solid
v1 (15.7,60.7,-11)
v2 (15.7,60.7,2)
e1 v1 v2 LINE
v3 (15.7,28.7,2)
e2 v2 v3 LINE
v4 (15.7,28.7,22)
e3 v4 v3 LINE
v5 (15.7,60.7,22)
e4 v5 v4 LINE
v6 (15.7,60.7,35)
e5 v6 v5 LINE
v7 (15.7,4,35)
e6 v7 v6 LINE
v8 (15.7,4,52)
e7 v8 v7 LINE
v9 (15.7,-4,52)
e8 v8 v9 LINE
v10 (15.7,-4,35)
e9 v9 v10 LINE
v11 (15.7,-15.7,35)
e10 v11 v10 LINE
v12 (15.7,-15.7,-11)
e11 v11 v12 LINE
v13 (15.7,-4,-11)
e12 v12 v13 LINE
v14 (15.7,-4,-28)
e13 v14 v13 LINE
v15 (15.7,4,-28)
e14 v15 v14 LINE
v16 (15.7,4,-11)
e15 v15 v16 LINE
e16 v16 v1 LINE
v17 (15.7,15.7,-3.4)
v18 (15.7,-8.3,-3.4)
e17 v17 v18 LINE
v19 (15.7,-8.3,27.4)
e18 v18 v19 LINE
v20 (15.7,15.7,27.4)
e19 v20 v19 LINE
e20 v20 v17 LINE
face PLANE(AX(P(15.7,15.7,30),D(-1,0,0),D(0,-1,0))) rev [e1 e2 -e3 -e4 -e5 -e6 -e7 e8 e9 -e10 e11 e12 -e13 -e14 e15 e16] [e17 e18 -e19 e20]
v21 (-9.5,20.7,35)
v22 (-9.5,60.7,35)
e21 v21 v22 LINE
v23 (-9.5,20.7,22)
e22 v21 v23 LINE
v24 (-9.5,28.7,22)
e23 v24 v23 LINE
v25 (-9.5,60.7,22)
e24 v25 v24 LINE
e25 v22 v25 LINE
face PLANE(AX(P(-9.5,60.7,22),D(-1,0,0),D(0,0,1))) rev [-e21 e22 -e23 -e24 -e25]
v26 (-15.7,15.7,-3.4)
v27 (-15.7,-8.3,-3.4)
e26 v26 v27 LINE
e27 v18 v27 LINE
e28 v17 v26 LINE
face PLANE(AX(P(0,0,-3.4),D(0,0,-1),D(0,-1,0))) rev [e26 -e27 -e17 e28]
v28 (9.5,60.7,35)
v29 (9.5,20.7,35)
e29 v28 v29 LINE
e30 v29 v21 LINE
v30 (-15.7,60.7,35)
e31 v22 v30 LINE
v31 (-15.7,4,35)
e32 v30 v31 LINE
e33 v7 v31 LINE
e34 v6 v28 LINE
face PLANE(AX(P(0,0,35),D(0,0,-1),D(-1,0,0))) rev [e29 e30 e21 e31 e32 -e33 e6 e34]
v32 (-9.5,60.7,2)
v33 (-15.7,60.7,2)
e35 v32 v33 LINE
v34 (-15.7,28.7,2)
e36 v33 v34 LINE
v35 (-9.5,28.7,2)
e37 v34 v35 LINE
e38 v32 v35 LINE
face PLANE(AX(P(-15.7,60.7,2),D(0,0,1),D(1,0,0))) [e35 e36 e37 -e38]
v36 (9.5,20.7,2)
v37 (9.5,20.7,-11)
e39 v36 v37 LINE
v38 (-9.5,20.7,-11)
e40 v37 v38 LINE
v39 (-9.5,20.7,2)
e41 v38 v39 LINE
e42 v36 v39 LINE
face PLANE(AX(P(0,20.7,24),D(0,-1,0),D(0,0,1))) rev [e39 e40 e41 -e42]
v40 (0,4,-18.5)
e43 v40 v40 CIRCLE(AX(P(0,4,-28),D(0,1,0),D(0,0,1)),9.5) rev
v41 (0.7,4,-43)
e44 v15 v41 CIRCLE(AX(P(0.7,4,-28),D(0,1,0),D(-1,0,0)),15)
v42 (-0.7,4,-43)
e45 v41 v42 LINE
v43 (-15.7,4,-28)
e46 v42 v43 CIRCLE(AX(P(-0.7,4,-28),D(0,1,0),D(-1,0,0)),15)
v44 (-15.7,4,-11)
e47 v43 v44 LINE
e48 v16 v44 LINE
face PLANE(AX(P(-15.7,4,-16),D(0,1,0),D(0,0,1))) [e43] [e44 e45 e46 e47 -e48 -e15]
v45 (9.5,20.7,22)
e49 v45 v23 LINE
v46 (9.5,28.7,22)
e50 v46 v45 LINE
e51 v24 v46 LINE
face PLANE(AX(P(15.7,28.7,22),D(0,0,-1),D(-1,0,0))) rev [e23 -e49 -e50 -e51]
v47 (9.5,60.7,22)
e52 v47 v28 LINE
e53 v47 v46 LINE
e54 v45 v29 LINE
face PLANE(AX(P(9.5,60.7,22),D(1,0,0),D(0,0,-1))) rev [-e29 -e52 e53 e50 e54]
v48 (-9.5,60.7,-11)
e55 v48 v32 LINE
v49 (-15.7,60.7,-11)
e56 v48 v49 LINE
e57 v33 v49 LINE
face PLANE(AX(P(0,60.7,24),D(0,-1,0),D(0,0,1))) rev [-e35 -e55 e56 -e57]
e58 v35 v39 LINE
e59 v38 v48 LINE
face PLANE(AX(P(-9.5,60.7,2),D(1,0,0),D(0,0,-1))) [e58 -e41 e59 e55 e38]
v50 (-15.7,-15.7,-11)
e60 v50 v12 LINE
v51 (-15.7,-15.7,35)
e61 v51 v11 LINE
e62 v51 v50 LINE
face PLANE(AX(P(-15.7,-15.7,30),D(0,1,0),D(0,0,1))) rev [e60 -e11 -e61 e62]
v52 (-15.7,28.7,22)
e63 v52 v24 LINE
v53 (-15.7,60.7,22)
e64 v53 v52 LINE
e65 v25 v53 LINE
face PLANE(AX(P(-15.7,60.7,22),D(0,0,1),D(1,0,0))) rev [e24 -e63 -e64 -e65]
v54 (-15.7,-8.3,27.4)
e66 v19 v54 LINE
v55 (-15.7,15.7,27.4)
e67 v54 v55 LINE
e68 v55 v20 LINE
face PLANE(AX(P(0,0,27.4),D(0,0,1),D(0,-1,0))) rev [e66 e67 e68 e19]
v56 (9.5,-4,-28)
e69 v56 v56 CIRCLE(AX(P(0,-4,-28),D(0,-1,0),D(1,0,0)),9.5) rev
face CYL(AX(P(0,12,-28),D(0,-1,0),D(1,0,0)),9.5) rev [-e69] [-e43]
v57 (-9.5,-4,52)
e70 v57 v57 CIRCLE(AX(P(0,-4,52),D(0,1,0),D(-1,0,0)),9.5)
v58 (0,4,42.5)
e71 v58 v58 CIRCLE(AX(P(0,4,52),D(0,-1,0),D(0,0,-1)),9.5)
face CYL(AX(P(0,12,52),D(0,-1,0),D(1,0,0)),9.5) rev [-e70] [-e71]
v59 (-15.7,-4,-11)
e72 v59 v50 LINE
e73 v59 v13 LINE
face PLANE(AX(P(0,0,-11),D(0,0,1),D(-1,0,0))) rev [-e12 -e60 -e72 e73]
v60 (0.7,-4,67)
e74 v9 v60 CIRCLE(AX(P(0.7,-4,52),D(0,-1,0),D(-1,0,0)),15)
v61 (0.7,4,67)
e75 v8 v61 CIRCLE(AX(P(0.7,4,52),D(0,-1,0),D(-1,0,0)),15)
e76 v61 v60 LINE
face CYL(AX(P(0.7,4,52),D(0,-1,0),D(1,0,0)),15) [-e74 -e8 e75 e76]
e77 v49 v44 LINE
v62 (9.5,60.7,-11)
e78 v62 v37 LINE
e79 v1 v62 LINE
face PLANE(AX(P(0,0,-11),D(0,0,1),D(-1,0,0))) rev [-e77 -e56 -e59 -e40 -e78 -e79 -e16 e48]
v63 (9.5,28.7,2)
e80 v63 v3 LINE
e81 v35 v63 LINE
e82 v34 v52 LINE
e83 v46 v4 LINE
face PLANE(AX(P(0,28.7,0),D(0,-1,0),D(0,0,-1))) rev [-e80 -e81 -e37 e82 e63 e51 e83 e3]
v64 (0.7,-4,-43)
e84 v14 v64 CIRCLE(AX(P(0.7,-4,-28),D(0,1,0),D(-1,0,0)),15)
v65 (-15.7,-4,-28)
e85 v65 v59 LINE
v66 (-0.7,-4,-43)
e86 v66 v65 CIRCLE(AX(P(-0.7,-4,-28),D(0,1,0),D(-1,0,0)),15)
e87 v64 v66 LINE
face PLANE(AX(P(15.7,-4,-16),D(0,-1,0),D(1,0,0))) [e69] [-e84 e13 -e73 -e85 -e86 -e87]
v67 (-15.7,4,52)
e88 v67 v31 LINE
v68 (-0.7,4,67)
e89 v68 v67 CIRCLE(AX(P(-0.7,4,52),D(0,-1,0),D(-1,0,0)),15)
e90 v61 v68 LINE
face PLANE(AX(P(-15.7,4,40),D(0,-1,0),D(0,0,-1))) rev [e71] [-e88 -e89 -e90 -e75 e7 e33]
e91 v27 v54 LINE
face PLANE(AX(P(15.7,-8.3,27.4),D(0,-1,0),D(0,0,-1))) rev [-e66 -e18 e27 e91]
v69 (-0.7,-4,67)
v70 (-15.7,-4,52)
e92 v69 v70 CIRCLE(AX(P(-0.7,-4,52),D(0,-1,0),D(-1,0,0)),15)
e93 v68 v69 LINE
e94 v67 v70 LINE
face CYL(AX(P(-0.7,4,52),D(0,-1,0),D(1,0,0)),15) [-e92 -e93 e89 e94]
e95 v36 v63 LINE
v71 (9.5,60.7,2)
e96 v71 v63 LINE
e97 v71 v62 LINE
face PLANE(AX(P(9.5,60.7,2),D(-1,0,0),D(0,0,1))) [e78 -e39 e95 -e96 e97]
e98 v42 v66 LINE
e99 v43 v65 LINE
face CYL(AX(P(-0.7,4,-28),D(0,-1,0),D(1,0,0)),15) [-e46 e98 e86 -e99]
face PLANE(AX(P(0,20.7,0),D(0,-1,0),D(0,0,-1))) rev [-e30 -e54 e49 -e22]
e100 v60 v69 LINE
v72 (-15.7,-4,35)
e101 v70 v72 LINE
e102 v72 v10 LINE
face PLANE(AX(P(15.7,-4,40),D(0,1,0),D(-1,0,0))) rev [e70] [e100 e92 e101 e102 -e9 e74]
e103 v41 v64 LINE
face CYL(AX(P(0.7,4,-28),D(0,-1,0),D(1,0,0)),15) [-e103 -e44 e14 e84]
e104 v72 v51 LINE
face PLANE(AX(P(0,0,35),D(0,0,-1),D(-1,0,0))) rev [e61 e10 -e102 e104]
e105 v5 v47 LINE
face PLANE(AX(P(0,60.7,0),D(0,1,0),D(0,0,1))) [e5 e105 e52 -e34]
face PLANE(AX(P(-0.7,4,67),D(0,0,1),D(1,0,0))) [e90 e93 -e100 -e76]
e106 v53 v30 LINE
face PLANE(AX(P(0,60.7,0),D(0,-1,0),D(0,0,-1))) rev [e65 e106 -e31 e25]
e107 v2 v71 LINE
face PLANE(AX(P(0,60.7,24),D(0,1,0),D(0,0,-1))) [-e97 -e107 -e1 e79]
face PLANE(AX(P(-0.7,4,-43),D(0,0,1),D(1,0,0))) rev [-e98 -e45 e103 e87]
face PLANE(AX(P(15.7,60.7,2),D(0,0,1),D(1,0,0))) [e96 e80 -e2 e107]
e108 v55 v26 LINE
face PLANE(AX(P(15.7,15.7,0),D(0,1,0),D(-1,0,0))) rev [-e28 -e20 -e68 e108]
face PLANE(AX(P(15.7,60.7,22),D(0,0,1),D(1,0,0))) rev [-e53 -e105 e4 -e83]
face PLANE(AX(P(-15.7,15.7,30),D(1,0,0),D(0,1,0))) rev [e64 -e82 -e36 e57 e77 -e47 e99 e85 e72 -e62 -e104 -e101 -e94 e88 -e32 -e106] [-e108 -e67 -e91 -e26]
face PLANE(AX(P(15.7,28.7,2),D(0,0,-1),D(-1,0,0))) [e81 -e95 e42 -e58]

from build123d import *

# Parameters (mm, degrees)
SKETCH4_W             = 31.4
SKETCH4_H             = 31.4
SKETCH4_W_2           = 25.4
SKETCH4_H_2           = 25.4
BOSS_EXTRUDE3_DEPTH   = 30
SKETCH5_W             = 31.4
SKETCH5_H             = 31.4
BOSS_EXTRUDE4_DEPTH   = 5
SKETCH6_W             = 31.4
SKETCH6_H             = 8
BOSS_EXTRUDE5_DEPTH   = 5
BOSS_EXTRUDE6_DEPTH   = 8
SKETCH8_R             = 9.5
BOSS_EXTRUDE7_DEPTH   = 8
SKETCH9_W             = 31.4
SKETCH9_H             = 10
BOSS_EXTRUDE8_DEPTH   = 5
SKETCH10_W            = 31.4
SKETCH10_H            = 10
BOSS_EXTRUDE9_DEPTH   = 13
SKETCH11_W            = 6.2
SKETCH11_H            = 10
BOSS_EXTRUDE10_DEPTH  = 40
BOSS_EXTRUDE11_DEPTH  = 3
SKETCH13_W            = 31.4
SKETCH13_H            = 31.4
CUT_EXTRUDE1_DEPTH    = 31.4
SKETCH14_W            = 31.4
SKETCH14_H            = 31.4
BOSS_EXTRUDE12_DEPTH  = 4
SKETCH16_W            = 31.4
SKETCH16_H            = 8
BOSS_EXTRUDE13_DEPTH  = 15.4
CUT_EXTRUDE3_START    = 8
SKETCH8_2_R           = 9.5
CUT_EXTRUDE3_DEPTH    = 24
MIRROR2_START         = -15.7
MIRROR2_DEPTH         = 36.4
MIRROR2_START_2       = 12.7
MIRROR2_2_OUTLINE_W   = 6.2
MIRROR2_2_OUTLINE_H   = 13
MIRROR2_2_DEPTH       = 48
MIRROR2_START_3       = -4
MIRROR2_3_OUTLINE_R   = 9.5
MIRROR2_3_DEPTH       = 8
MIRROR2_4_OUTLINE_W   = 31.4
MIRROR2_4_OUTLINE_H   = 10
MIRROR2_4_DEPTH       = 16
MIRROR2_5_OUTLINE_W   = 25.4
MIRROR2_5_OUTLINE_H   = 15.4
MIRROR2_5_DEPTH       = 8
MIRROR2_6_OUTLINE_W   = 25.4
MIRROR2_6_OUTLINE_H   = 12
MIRROR2_6_OUTLINE_W_2 = 19
MIRROR2_6_OUTLINE_H_2 = 5.4
MIRROR2_6_DEPTH       = 8
SKETCH17_W            = 30.8
SKETCH17_H            = 24
CUT_EXTRUDE2_DEPTH    = 31.4


# Read off the part's stored shape, not the designer's step: Mirror2
with BuildPart() as part:
    # Sketch4 → Boss-Extrude3 (new body)
    with BuildSketch(Plane.XY):
        Rectangle(SKETCH4_W, SKETCH4_H)
        Rectangle(SKETCH4_W_2, SKETCH4_H_2, mode=Mode.SUBTRACT)
    extrude(amount=BOSS_EXTRUDE3_DEPTH)

    # Sketch5 → Boss-Extrude4 (add)
    with BuildSketch(Plane.XY.offset(30)):
        Rectangle(SKETCH5_W, SKETCH5_H)
    extrude(amount=BOSS_EXTRUDE4_DEPTH)

    # Sketch6 → Boss-Extrude5 (add)
    with BuildSketch(Plane.XY.offset(35)):
        Rectangle(SKETCH6_W, SKETCH6_H)
    extrude(amount=BOSS_EXTRUDE5_DEPTH)

    # Sketch7 → Boss-Extrude6 (add)
    with BuildSketch(Plane.XZ.offset(4)):
        with BuildLine():
            Line((-15.7, 40), (-15.7, 52))
            ThreePointArc((-15.7, 52), (-11.306601718, 62.606601718), (-0.7, 67))
            Line((-0.7, 67), (0.7, 67))
            ThreePointArc((0.7, 67), (11.306601718, 62.606601718), (15.7, 52))
            Line((15.7, 52), (15.7, 40))
            Line((15.7, 40), (-15.7, 40))
        make_face()
    extrude(amount=-BOSS_EXTRUDE6_DEPTH)

    # Sketch8 → Boss-Extrude7 (add)
    with BuildSketch(Plane.XZ.offset(4)):
        with Locations(Location((0, 52, 0), (0, 0, 180))):
            Circle(SKETCH8_R)
    boss_extrude7 = extrude(amount=BOSS_EXTRUDE7_DEPTH)

    # Mirror1: Boss-Extrude7 across plane
    add(boss_extrude7.mirror(Plane.ZX))

    # Sketch9 → Boss-Extrude8 (add)
    with BuildSketch(Plane(origin=(0, 15.7, 0), x_dir=(1, 0, 0), z_dir=(0, 1, 0))):
        with Locations((0, -27)):
            Rectangle(SKETCH9_W, SKETCH9_H)
    extrude(amount=BOSS_EXTRUDE8_DEPTH)

    # Sketch10 → Boss-Extrude9 (add)
    with BuildSketch(Plane(origin=(0, 15.7, 0), x_dir=(1, 0, 0), z_dir=(0, 1, 0))):
        with Locations((0, -17)):
            Rectangle(SKETCH10_W, SKETCH10_H)
    extrude(amount=BOSS_EXTRUDE9_DEPTH)

    # Sketch11 → Boss-Extrude10 (add)
    with BuildSketch(Plane(origin=(0, 20.7, 0), x_dir=(1, 0, 0), z_dir=(0, 1, 0))):
        with Locations((-12.6, -27)):
            Rectangle(SKETCH11_W, SKETCH11_H)
        with Locations((12.6, -27)):
            Rectangle(SKETCH11_W, SKETCH11_H)
    extrude(amount=BOSS_EXTRUDE10_DEPTH)

    # Sketch12 → Boss-Extrude11 (add)
    with BuildSketch(Plane.XY.offset(32)):
        Polygon((-15.7, 60.7), (-9.5, 60.7), (-9.5, 20.7), (9.5, 20.7), (9.5, 60.7), (15.7, 60.7), (15.7, 15.7), (-15.7, 15.7), align=None)
    extrude(amount=BOSS_EXTRUDE11_DEPTH)

    # Sketch13 → Cut-Extrude1 (cut)
    with BuildSketch(Plane.ZY.offset(15.7)):
        with Locations((15.7, 0)):
            Rectangle(SKETCH13_W, SKETCH13_H)
    extrude(amount=-CUT_EXTRUDE1_DEPTH, mode=Mode.SUBTRACT)

    # Sketch14 → Boss-Extrude12 (add)
    with BuildSketch(Plane(origin=(0, 0, 31.4), x_dir=(-1, 0, 0), z_dir=(0, 0, -1))):
        Rectangle(SKETCH14_W, SKETCH14_H)
    extrude(amount=BOSS_EXTRUDE12_DEPTH)

    # Sketch16 → Boss-Extrude13 (add)
    with BuildSketch(Plane(origin=(0, 0, 27.4), x_dir=(-1, 0, 0), z_dir=(0, 0, -1))):
        with Locations((0, -11.7)):
            Rectangle(SKETCH16_W, SKETCH16_H)
    extrude(amount=BOSS_EXTRUDE13_DEPTH)

    # Sketch8<2> → Cut-Extrude3 (cut)
    with BuildSketch(Plane.XZ.offset(4).offset(CUT_EXTRUDE3_START)):
        with Locations(Location((0, 52, 0), (0, 0, 270))):
            Circle(SKETCH8_2_R)
    extrude(amount=-CUT_EXTRUDE3_DEPTH, mode=Mode.SUBTRACT)

    # Mirror2 outline → Mirror2 (add)
    with BuildSketch(Plane(origin=(0, 0, 0), x_dir=(1, 0, 0), z_dir=(0, 1, 0)).offset(MIRROR2_START)):
        Polygon((12.7, -24), (15.7, -24), (15.7, 11), (-15.7, 11), (-15.7, -24), (-12.7, -24), (-12.7, 3.4), (12.7, 3.4), align=None)
    extrude(amount=MIRROR2_DEPTH)

    # Mirror2 2 outline → Mirror2 2 (add)
    with BuildSketch(Plane(origin=(0, 0, 0), x_dir=(1, 0, 0), z_dir=(0, 1, 0)).offset(MIRROR2_START_2)):
        with Locations((12.6, 4.5)):
            Rectangle(MIRROR2_2_OUTLINE_W, MIRROR2_2_OUTLINE_H)
        with Locations((-12.6, 4.5)):
            Rectangle(MIRROR2_2_OUTLINE_W, MIRROR2_2_OUTLINE_H)
    extrude(amount=MIRROR2_2_DEPTH)

    # Mirror2 3 outline → Mirror2 3 (add)
    with BuildSketch(Plane(origin=(0, 0, 0), x_dir=(1, 0, 0), z_dir=(0, 1, 0)).offset(MIRROR2_START_3)):
        with BuildLine():
            Line((-15.7, 11), (15.7, 11))
            Line((15.7, 11), (15.7, 28))
            ThreePointArc((15.7, 28), (11.306601718, 38.606601718), (0.7, 43))
            Line((0.7, 43), (-0.7, 43))
            ThreePointArc((-0.7, 43), (-11.306601718, 38.606601718), (-15.7, 28))
            Line((-15.7, 28), (-15.7, 11))
        make_face()
        with Locations((0, 28)):
            Circle(MIRROR2_3_OUTLINE_R, mode=Mode.SUBTRACT)
    extrude(amount=MIRROR2_3_DEPTH)

    # Mirror2 4 outline → Mirror2 4 (add)
    with BuildSketch(Plane(origin=(0, 0, 0), x_dir=(1, 0, 0), z_dir=(0, 1, 0)).offset(MIRROR2_START_2)):
        with Locations((0, -7)):
            Rectangle(MIRROR2_4_OUTLINE_W, MIRROR2_4_OUTLINE_H)
    extrude(amount=MIRROR2_4_DEPTH)

    # Mirror2 5 outline → Mirror2 5 (add)
    with BuildSketch(Plane(origin=(0, 0, 0), x_dir=(1, 0, 0), z_dir=(0, 1, 0)).offset(MIRROR2_START)):
        with Locations((0, -4.3)):
            Rectangle(MIRROR2_5_OUTLINE_W, MIRROR2_5_OUTLINE_H)
    extrude(amount=MIRROR2_5_DEPTH)

    # Mirror2 6 outline → Mirror2 6 (add)
    with BuildSketch(Plane(origin=(0, 0, 0), x_dir=(1, 0, 0), z_dir=(0, 1, 0)).offset(MIRROR2_START_2)):
        with Locations((0, -18)):
            Rectangle(MIRROR2_6_OUTLINE_W, MIRROR2_6_OUTLINE_H)
        with Locations((0, 0.7)):
            Rectangle(MIRROR2_6_OUTLINE_W_2, MIRROR2_6_OUTLINE_H_2)
    extrude(amount=MIRROR2_6_DEPTH)

    # Sketch17 → Cut-Extrude2 (cut)
    with BuildSketch(Plane.ZY.offset(15.7)):
        with Locations((12, 3.7)):
            Rectangle(SKETCH17_W, SKETCH17_H)
    extrude(amount=-CUT_EXTRUDE2_DEPTH, mode=Mode.SUBTRACT)


solid = part.part
